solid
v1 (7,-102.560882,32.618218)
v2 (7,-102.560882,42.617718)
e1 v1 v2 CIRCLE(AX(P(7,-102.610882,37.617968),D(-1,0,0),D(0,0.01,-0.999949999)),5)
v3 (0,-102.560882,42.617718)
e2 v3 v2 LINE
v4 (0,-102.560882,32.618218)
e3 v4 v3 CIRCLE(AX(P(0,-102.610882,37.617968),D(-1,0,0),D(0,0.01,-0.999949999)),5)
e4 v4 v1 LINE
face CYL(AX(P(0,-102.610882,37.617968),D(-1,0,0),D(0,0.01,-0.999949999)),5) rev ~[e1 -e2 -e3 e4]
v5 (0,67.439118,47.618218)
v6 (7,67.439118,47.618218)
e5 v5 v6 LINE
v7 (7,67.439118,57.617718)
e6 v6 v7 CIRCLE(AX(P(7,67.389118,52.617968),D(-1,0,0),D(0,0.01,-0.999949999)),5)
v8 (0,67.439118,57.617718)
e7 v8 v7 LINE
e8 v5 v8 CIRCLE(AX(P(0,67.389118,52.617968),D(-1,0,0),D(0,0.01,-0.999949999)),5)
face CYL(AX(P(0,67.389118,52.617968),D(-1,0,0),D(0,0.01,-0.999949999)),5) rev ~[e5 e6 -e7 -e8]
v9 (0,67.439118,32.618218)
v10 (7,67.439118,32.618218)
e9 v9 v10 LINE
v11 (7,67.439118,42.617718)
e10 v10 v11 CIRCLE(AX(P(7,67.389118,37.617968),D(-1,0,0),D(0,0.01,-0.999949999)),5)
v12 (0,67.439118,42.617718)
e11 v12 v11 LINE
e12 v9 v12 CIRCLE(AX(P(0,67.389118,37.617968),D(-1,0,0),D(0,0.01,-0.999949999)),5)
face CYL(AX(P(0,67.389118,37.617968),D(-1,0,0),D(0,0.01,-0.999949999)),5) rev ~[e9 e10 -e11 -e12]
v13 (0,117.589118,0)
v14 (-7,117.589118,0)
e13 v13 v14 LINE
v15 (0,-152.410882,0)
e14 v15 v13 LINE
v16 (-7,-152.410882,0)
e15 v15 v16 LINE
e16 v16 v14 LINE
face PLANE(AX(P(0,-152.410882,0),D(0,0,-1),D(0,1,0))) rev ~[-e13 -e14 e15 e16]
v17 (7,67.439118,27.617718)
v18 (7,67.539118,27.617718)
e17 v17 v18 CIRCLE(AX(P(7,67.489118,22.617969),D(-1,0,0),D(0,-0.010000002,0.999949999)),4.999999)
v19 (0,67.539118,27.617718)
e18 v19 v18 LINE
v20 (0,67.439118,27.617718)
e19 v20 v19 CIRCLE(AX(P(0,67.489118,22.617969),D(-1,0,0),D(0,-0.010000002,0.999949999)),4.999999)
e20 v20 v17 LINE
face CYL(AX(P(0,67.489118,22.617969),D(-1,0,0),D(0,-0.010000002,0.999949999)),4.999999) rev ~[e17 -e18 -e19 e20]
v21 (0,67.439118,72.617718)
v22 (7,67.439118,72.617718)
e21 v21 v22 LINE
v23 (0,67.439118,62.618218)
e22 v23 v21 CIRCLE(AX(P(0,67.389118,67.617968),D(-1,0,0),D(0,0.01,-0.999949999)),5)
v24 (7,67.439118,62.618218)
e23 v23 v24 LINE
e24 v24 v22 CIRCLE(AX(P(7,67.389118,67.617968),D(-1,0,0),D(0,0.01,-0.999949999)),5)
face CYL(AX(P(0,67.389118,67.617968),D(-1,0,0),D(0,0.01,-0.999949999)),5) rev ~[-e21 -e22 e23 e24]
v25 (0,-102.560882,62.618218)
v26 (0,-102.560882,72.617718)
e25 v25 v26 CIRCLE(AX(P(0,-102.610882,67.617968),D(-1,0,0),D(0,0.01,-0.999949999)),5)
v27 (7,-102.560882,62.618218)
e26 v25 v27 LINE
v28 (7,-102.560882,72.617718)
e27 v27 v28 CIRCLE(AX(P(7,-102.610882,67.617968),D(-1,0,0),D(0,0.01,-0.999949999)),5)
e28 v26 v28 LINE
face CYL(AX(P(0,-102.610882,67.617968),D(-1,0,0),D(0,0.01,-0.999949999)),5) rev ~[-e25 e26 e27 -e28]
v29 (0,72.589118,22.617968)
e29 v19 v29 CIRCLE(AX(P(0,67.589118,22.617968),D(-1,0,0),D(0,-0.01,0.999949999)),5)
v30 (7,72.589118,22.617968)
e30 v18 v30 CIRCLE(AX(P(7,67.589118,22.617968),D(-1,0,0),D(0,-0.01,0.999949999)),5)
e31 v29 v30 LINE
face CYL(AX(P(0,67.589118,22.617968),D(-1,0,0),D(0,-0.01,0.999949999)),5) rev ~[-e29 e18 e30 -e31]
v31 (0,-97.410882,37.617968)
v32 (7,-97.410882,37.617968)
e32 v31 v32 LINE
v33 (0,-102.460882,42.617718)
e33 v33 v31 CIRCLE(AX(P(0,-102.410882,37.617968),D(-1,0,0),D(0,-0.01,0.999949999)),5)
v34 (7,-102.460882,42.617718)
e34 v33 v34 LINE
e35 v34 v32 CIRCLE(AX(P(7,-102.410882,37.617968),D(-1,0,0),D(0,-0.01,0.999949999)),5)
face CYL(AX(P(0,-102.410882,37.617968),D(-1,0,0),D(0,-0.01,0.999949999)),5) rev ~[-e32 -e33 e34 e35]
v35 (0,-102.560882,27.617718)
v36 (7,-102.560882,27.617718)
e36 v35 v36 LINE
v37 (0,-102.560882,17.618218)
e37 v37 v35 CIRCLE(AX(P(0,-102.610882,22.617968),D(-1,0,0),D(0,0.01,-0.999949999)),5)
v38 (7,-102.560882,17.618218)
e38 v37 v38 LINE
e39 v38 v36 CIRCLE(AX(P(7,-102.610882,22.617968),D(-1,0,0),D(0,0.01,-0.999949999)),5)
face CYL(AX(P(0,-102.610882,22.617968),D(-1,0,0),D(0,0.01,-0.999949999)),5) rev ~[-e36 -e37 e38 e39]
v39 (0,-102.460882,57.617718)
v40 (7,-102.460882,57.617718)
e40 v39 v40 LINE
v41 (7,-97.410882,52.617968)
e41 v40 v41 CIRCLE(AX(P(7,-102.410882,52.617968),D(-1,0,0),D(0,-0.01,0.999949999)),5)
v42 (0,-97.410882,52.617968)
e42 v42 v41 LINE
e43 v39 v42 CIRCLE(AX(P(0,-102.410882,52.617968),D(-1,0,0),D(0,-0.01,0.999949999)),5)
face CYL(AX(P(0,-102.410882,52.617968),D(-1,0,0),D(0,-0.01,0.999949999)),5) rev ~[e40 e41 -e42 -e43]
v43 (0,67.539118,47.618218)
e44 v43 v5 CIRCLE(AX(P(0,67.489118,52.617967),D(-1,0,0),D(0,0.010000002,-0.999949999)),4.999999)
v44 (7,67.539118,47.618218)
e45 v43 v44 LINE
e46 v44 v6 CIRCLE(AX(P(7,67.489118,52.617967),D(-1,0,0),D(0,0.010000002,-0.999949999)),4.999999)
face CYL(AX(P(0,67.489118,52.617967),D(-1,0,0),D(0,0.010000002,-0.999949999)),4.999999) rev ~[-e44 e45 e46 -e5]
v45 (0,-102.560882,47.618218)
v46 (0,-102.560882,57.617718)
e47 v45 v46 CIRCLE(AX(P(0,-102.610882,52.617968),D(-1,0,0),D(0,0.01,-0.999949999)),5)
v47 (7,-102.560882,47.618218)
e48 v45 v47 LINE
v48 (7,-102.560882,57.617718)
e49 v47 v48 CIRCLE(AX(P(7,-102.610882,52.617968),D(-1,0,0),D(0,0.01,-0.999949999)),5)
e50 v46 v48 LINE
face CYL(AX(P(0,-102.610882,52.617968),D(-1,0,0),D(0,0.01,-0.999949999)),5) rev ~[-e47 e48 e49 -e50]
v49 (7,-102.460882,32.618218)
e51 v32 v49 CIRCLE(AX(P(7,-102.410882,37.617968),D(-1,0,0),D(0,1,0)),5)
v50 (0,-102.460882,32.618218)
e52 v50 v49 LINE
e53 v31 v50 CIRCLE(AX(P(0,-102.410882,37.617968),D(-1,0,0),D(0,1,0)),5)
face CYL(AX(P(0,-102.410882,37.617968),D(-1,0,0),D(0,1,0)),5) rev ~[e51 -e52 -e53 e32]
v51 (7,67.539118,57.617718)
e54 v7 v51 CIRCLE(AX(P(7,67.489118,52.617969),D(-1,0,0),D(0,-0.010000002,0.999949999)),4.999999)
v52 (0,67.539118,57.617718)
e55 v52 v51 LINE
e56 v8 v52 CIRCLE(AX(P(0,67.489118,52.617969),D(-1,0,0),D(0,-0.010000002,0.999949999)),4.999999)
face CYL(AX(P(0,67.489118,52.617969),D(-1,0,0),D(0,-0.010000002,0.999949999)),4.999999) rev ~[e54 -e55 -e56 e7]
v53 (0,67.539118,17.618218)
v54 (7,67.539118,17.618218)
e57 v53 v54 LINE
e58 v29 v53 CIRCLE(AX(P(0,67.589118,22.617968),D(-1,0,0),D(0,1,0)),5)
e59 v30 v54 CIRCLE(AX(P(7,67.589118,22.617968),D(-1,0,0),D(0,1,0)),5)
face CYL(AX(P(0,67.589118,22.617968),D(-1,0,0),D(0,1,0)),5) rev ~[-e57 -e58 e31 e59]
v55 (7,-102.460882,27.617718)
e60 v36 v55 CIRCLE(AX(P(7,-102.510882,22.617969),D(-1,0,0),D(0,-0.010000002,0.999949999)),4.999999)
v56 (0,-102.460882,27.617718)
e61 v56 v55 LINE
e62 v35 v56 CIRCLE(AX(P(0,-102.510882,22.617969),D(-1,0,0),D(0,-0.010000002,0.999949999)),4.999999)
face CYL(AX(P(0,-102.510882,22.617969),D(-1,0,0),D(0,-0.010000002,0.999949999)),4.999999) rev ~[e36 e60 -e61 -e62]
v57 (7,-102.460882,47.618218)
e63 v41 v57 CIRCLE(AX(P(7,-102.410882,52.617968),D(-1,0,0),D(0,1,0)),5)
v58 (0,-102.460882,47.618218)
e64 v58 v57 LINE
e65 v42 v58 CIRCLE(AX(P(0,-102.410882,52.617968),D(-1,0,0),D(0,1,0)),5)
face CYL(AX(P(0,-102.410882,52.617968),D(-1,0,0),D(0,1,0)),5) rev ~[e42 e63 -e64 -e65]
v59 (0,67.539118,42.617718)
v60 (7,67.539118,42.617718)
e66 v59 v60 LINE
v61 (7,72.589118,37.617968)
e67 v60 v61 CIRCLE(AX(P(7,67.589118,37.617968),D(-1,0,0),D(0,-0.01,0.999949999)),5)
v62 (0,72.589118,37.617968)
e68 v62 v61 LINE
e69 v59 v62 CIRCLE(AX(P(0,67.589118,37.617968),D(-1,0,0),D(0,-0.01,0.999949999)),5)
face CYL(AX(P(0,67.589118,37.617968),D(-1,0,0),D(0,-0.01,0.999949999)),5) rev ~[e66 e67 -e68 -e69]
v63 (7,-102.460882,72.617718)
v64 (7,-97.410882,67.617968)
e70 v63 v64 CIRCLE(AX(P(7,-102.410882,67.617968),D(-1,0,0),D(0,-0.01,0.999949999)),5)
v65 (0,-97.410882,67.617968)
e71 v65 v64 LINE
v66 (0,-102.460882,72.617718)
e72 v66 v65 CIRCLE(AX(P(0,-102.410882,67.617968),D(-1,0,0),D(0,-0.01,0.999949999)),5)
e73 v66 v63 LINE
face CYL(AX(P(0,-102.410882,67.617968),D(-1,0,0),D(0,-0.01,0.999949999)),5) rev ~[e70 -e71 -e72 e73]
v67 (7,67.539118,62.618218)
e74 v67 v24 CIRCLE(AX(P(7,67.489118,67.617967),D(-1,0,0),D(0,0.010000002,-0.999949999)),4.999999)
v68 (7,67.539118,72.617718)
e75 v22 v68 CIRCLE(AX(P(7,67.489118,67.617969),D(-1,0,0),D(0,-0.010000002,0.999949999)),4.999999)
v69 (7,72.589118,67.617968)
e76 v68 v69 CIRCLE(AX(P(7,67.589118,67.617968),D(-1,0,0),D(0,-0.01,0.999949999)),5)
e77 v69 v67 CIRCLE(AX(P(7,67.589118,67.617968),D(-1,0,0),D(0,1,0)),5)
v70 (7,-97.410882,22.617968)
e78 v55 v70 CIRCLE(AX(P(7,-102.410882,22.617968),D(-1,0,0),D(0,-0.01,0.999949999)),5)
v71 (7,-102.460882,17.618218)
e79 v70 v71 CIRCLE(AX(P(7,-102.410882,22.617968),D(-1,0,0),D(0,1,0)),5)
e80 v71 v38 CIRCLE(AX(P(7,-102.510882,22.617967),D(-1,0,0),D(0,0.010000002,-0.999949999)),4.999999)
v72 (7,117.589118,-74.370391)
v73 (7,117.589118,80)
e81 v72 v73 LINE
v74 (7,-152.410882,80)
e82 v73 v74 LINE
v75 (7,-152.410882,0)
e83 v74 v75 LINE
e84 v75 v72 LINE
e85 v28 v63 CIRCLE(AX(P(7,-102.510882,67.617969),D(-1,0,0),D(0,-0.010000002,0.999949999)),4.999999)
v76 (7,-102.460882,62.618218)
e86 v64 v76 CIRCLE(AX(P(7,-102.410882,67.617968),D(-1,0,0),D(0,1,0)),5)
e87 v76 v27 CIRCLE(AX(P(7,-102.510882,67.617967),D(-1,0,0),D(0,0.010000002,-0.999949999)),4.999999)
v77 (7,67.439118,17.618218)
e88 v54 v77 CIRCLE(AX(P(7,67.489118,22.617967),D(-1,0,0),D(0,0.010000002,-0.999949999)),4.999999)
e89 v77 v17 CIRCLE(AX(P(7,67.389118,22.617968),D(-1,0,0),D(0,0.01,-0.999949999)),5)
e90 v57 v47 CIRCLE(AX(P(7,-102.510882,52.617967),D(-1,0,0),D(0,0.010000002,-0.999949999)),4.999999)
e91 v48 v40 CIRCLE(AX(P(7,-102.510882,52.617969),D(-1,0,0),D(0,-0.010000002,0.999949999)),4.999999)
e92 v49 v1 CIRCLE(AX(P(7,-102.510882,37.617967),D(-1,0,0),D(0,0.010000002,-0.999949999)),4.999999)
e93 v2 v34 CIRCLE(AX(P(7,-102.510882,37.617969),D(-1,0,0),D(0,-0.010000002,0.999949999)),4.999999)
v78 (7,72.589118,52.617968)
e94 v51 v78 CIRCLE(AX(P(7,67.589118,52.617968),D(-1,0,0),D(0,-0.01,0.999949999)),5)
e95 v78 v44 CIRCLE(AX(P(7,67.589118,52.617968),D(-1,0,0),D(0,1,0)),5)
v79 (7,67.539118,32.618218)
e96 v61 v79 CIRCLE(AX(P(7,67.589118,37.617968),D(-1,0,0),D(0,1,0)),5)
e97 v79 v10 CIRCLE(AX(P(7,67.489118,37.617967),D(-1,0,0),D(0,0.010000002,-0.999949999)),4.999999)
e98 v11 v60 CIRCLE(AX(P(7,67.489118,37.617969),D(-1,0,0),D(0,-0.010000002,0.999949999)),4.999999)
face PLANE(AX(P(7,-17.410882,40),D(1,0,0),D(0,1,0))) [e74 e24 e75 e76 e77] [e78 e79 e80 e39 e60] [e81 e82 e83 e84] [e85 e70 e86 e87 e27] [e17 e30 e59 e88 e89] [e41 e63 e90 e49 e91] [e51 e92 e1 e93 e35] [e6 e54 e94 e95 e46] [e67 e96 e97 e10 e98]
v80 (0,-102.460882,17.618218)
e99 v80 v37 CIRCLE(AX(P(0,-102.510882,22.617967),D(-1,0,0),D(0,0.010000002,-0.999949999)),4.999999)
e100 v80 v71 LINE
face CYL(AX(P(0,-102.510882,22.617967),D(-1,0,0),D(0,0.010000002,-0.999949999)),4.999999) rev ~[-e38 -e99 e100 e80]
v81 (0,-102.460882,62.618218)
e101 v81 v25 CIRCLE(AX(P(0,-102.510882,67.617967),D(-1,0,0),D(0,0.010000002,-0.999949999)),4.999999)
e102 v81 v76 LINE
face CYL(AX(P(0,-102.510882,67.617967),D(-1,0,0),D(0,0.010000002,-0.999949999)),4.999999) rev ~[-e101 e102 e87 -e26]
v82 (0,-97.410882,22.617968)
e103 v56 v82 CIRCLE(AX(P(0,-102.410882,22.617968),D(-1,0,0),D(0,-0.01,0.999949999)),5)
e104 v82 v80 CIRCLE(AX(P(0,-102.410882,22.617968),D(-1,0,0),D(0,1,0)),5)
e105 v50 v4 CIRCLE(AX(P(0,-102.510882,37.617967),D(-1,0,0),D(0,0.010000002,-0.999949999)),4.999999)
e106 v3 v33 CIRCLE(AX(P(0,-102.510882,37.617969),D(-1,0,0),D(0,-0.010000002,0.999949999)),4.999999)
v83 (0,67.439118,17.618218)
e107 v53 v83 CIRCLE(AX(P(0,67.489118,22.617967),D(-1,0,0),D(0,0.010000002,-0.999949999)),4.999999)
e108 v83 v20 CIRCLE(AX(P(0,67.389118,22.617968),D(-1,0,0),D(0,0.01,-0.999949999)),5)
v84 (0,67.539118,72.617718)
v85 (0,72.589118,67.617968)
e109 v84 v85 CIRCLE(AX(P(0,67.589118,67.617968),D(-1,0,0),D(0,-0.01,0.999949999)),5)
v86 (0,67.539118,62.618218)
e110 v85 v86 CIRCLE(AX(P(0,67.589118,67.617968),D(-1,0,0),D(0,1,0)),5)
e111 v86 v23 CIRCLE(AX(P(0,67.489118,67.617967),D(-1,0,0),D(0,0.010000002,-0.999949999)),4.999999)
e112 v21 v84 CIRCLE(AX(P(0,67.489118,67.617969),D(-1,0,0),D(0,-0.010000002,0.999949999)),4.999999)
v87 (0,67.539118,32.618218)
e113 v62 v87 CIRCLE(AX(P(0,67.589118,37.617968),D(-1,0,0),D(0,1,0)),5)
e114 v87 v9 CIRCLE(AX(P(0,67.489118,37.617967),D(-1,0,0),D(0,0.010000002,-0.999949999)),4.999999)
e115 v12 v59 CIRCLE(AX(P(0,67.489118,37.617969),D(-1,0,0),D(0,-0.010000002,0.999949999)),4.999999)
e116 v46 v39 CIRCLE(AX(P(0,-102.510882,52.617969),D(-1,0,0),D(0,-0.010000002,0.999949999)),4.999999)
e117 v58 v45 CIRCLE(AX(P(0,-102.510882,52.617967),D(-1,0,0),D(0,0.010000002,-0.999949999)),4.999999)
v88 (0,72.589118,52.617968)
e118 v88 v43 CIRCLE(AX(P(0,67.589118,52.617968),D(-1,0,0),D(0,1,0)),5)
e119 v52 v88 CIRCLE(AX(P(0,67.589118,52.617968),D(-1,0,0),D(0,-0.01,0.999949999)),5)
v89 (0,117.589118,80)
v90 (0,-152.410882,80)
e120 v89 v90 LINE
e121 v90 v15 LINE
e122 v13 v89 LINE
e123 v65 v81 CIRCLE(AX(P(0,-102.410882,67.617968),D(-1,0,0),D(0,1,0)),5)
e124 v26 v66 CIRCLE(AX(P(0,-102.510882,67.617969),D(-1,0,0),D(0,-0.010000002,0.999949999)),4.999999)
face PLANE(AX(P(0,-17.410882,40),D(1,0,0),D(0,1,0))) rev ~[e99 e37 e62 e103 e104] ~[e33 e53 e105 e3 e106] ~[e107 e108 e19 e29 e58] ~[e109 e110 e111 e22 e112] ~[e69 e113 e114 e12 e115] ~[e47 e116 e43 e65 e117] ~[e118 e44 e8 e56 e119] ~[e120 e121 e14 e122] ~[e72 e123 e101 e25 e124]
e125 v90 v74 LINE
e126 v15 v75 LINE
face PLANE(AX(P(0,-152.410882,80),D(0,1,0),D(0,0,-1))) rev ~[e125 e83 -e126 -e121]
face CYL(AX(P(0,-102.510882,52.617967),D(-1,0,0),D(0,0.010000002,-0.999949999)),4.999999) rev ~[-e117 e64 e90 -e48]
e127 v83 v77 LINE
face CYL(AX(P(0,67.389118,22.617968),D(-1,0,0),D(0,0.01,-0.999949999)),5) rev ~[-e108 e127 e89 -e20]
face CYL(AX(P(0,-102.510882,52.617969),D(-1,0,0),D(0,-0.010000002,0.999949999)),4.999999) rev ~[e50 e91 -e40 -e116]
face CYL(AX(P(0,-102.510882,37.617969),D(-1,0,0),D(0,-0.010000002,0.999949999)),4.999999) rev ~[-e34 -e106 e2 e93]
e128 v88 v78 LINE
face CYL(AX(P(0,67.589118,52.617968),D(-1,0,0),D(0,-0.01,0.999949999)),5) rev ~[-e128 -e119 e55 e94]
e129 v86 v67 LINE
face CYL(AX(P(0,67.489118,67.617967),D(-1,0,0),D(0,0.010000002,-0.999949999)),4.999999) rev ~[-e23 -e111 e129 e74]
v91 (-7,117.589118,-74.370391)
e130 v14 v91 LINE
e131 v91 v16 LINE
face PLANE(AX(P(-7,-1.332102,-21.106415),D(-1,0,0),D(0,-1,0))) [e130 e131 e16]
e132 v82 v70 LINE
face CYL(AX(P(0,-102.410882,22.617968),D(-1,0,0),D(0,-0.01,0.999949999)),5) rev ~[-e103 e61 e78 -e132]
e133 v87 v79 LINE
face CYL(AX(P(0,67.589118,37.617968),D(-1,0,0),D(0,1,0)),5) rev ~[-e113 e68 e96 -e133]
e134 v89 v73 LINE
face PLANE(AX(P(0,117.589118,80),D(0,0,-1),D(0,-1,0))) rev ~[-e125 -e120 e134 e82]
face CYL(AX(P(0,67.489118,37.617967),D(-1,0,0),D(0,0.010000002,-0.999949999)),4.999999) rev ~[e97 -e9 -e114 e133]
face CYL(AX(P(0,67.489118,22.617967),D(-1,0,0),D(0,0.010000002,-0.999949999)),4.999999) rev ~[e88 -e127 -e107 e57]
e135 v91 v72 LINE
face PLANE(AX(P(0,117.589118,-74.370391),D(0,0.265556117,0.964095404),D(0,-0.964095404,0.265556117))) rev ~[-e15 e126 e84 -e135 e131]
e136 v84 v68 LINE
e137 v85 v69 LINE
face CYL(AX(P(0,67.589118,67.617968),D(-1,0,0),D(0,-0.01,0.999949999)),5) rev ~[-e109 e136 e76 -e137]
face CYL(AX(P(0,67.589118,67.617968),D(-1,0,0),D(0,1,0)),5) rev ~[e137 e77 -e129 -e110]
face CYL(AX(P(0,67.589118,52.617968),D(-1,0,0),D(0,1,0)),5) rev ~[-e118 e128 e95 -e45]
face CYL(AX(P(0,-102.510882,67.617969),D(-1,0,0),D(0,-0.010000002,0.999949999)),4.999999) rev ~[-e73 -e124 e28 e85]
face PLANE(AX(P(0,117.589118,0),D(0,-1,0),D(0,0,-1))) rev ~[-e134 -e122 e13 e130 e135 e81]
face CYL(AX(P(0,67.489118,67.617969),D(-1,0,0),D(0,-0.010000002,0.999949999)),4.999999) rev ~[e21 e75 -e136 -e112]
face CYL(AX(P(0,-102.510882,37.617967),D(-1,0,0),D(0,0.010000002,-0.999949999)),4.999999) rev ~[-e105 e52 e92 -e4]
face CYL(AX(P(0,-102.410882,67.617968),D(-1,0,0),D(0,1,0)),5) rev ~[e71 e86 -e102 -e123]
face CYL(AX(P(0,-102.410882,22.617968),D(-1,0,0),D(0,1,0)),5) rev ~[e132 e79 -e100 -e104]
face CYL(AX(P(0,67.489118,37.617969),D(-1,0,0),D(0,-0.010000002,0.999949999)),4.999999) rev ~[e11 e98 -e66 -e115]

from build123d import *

# Parameters (mm, degrees)
F1_DEPTH = 7
F3_DEPTH = 7


# Not quite as in the source:
# - a feature names something its author has since deleted; it is built from what else it names


with BuildPart() as f1:
    # F0 (on Right) → F1 (new body)
    with BuildSketch(Plane.YZ):
        Polygon((-102.4108821703, 80), (-152.4108821703, 80), (-152.4108821703, 0), (117.5891178297, 0), (117.5891178297, 80), (67.5891178297, 80), align=None)
        with BuildLine():
            ThreePointArc((-102.4608821703, 27.6177177185), (-98.8930703505, 26.1711353257), (-97.4108821703, 22.6179677248))
            ThreePointArc((-97.4108821703, 22.6179677248), (-98.8930703505, 19.0648001239), (-102.4608821703, 17.6182177311))
            ThreePointArc((-102.4608821703, 17.6182177311), (-102.5108821703, 17.6179677248), (-102.5608821703, 17.6182177311))
            ThreePointArc((-102.5608821703, 17.6182177311), (-107.6108821703, 22.6179677248), (-102.5608821703, 27.6177177185))
            ThreePointArc((-102.5608821703, 27.6177177185), (-102.5108821703, 27.6179677248), (-102.4608821703, 27.6177177185))
        make_face(mode=Mode.SUBTRACT)
        with BuildLine():
            ThreePointArc((-102.4608821703, 42.6177177185), (-98.8930703505, 41.1711353257), (-97.4108821703, 37.6179677248))
            ThreePointArc((-97.4108821703, 37.6179677248), (-98.8930703505, 34.0648001239), (-102.4608821703, 32.6182177311))
            ThreePointArc((-102.4608821703, 32.6182177311), (-102.5108821703, 32.6179677248), (-102.5608821703, 32.6182177311))
            ThreePointArc((-102.5608821703, 32.6182177311), (-107.6108821703, 37.6179677248), (-102.5608821703, 42.6177177185))
            ThreePointArc((-102.5608821703, 42.6177177185), (-102.5108821703, 42.6179677248), (-102.4608821703, 42.6177177185))
        make_face(mode=Mode.SUBTRACT)
        with BuildLine():
            ThreePointArc((-102.4608821703, 57.6177177185), (-98.8930703505, 56.1711353257), (-97.4108821703, 52.6179677248))
            ThreePointArc((-97.4108821703, 52.6179677248), (-98.8930703505, 49.0648001239), (-102.4608821703, 47.6182177311))
            ThreePointArc((-102.4608821703, 47.6182177311), (-102.5108821703, 47.6179677248), (-102.5608821703, 47.6182177311))
            ThreePointArc((-102.5608821703, 47.6182177311), (-107.6108821703, 52.6179677248), (-102.5608821703, 57.6177177185))
            ThreePointArc((-102.5608821703, 57.6177177185), (-102.5108821703, 57.6179677248), (-102.4608821703, 57.6177177185))
        make_face(mode=Mode.SUBTRACT)
        with BuildLine():
            ThreePointArc((-102.4608821703, 72.6177177185), (-98.8930703505, 71.1711353257), (-97.4108821703, 67.6179677248))
            ThreePointArc((-97.4108821703, 67.6179677248), (-98.8930703505, 64.0648001239), (-102.4608821703, 62.6182177311))
            ThreePointArc((-102.4608821703, 62.6182177311), (-102.5108821703, 62.6179677248), (-102.5608821703, 62.6182177311))
            ThreePointArc((-102.5608821703, 62.6182177311), (-107.6108821703, 67.6179677248), (-102.5608821703, 72.6177177185))
            ThreePointArc((-102.5608821703, 72.6177177185), (-102.5108821703, 72.6179677248), (-102.4608821703, 72.6177177185))
        make_face(mode=Mode.SUBTRACT)
        with BuildLine():
            ThreePointArc((67.5391178297, 27.6177177185), (71.1069296495, 26.1711353257), (72.5891178297, 22.6179677248))
            ThreePointArc((72.5891178297, 22.6179677248), (71.1069296495, 19.0648001239), (67.5391178297, 17.6182177311))
            ThreePointArc((67.5391178297, 17.6182177311), (67.4891178297, 17.6179677248), (67.4391178297, 17.6182177311))
            ThreePointArc((67.4391178297, 17.6182177311), (62.3891178297, 22.6179677248), (67.4391178297, 27.6177177185))
            ThreePointArc((67.4391178297, 27.6177177185), (67.4891178297, 27.6179677248), (67.5391178297, 27.6177177185))
        make_face(mode=Mode.SUBTRACT)
        with BuildLine():
            ThreePointArc((67.5391178297, 42.6177177185), (71.1069296495, 41.1711353257), (72.5891178297, 37.6179677248))
            ThreePointArc((72.5891178297, 37.6179677248), (71.1069296495, 34.0648001239), (67.5391178297, 32.6182177311))
            ThreePointArc((67.5391178297, 32.6182177311), (67.4891178297, 32.6179677248), (67.4391178297, 32.6182177311))
            ThreePointArc((67.4391178297, 32.6182177311), (62.3891178297, 37.6179677248), (67.4391178297, 42.6177177185))
            ThreePointArc((67.4391178297, 42.6177177185), (67.4891178297, 42.6179677248), (67.5391178297, 42.6177177185))
        make_face(mode=Mode.SUBTRACT)
        with BuildLine():
            ThreePointArc((67.5391178297, 57.6177177185), (71.1069296495, 56.1711353257), (72.5891178297, 52.6179677248))
            ThreePointArc((72.5891178297, 52.6179677248), (71.1069296495, 49.0648001239), (67.5391178297, 47.6182177311))
            ThreePointArc((67.5391178297, 47.6182177311), (67.4891178297, 47.6179677248), (67.4391178297, 47.6182177311))
            ThreePointArc((67.4391178297, 47.6182177311), (62.3891178297, 52.6179677248), (67.4391178297, 57.6177177185))
            ThreePointArc((67.4391178297, 57.6177177185), (67.4891178297, 57.6179677248), (67.5391178297, 57.6177177185))
        make_face(mode=Mode.SUBTRACT)
        with BuildLine():
            ThreePointArc((67.5391178297, 72.6177177185), (71.1069296495, 71.1711353257), (72.5891178297, 67.6179677248))
            ThreePointArc((72.5891178297, 67.6179677248), (71.1069296495, 64.0648001239), (67.5391178297, 62.6182177311))
            ThreePointArc((67.5391178297, 62.6182177311), (67.4891178297, 62.6179677248), (67.4391178297, 62.6182177311))
            ThreePointArc((67.4391178297, 62.6182177311), (62.3891178297, 67.6179677248), (67.4391178297, 72.6177177185))
            ThreePointArc((67.4391178297, 72.6177177185), (67.4891178297, 72.6179677248), (67.5391178297, 72.6177177185))
        make_face(mode=Mode.SUBTRACT)
        Polygon((117.5891178297, 0), (-152.4108821703, 0), (117.5891178297, -74.3703905304), align=None)
    extrude(amount=F1_DEPTH)

    # F2 (on face) → F3 (join)
    with BuildSketch(Plane(origin=(0, 0, 0), x_dir=(0, -1, 0), z_dir=(-1, 0, 0))):
        Polygon((-117.5891178297, -74.3703905304), (152.4108821703, 0), (-117.5891178297, 0), align=None)
    extrude(amount=F3_DEPTH)


solid = f1.part
